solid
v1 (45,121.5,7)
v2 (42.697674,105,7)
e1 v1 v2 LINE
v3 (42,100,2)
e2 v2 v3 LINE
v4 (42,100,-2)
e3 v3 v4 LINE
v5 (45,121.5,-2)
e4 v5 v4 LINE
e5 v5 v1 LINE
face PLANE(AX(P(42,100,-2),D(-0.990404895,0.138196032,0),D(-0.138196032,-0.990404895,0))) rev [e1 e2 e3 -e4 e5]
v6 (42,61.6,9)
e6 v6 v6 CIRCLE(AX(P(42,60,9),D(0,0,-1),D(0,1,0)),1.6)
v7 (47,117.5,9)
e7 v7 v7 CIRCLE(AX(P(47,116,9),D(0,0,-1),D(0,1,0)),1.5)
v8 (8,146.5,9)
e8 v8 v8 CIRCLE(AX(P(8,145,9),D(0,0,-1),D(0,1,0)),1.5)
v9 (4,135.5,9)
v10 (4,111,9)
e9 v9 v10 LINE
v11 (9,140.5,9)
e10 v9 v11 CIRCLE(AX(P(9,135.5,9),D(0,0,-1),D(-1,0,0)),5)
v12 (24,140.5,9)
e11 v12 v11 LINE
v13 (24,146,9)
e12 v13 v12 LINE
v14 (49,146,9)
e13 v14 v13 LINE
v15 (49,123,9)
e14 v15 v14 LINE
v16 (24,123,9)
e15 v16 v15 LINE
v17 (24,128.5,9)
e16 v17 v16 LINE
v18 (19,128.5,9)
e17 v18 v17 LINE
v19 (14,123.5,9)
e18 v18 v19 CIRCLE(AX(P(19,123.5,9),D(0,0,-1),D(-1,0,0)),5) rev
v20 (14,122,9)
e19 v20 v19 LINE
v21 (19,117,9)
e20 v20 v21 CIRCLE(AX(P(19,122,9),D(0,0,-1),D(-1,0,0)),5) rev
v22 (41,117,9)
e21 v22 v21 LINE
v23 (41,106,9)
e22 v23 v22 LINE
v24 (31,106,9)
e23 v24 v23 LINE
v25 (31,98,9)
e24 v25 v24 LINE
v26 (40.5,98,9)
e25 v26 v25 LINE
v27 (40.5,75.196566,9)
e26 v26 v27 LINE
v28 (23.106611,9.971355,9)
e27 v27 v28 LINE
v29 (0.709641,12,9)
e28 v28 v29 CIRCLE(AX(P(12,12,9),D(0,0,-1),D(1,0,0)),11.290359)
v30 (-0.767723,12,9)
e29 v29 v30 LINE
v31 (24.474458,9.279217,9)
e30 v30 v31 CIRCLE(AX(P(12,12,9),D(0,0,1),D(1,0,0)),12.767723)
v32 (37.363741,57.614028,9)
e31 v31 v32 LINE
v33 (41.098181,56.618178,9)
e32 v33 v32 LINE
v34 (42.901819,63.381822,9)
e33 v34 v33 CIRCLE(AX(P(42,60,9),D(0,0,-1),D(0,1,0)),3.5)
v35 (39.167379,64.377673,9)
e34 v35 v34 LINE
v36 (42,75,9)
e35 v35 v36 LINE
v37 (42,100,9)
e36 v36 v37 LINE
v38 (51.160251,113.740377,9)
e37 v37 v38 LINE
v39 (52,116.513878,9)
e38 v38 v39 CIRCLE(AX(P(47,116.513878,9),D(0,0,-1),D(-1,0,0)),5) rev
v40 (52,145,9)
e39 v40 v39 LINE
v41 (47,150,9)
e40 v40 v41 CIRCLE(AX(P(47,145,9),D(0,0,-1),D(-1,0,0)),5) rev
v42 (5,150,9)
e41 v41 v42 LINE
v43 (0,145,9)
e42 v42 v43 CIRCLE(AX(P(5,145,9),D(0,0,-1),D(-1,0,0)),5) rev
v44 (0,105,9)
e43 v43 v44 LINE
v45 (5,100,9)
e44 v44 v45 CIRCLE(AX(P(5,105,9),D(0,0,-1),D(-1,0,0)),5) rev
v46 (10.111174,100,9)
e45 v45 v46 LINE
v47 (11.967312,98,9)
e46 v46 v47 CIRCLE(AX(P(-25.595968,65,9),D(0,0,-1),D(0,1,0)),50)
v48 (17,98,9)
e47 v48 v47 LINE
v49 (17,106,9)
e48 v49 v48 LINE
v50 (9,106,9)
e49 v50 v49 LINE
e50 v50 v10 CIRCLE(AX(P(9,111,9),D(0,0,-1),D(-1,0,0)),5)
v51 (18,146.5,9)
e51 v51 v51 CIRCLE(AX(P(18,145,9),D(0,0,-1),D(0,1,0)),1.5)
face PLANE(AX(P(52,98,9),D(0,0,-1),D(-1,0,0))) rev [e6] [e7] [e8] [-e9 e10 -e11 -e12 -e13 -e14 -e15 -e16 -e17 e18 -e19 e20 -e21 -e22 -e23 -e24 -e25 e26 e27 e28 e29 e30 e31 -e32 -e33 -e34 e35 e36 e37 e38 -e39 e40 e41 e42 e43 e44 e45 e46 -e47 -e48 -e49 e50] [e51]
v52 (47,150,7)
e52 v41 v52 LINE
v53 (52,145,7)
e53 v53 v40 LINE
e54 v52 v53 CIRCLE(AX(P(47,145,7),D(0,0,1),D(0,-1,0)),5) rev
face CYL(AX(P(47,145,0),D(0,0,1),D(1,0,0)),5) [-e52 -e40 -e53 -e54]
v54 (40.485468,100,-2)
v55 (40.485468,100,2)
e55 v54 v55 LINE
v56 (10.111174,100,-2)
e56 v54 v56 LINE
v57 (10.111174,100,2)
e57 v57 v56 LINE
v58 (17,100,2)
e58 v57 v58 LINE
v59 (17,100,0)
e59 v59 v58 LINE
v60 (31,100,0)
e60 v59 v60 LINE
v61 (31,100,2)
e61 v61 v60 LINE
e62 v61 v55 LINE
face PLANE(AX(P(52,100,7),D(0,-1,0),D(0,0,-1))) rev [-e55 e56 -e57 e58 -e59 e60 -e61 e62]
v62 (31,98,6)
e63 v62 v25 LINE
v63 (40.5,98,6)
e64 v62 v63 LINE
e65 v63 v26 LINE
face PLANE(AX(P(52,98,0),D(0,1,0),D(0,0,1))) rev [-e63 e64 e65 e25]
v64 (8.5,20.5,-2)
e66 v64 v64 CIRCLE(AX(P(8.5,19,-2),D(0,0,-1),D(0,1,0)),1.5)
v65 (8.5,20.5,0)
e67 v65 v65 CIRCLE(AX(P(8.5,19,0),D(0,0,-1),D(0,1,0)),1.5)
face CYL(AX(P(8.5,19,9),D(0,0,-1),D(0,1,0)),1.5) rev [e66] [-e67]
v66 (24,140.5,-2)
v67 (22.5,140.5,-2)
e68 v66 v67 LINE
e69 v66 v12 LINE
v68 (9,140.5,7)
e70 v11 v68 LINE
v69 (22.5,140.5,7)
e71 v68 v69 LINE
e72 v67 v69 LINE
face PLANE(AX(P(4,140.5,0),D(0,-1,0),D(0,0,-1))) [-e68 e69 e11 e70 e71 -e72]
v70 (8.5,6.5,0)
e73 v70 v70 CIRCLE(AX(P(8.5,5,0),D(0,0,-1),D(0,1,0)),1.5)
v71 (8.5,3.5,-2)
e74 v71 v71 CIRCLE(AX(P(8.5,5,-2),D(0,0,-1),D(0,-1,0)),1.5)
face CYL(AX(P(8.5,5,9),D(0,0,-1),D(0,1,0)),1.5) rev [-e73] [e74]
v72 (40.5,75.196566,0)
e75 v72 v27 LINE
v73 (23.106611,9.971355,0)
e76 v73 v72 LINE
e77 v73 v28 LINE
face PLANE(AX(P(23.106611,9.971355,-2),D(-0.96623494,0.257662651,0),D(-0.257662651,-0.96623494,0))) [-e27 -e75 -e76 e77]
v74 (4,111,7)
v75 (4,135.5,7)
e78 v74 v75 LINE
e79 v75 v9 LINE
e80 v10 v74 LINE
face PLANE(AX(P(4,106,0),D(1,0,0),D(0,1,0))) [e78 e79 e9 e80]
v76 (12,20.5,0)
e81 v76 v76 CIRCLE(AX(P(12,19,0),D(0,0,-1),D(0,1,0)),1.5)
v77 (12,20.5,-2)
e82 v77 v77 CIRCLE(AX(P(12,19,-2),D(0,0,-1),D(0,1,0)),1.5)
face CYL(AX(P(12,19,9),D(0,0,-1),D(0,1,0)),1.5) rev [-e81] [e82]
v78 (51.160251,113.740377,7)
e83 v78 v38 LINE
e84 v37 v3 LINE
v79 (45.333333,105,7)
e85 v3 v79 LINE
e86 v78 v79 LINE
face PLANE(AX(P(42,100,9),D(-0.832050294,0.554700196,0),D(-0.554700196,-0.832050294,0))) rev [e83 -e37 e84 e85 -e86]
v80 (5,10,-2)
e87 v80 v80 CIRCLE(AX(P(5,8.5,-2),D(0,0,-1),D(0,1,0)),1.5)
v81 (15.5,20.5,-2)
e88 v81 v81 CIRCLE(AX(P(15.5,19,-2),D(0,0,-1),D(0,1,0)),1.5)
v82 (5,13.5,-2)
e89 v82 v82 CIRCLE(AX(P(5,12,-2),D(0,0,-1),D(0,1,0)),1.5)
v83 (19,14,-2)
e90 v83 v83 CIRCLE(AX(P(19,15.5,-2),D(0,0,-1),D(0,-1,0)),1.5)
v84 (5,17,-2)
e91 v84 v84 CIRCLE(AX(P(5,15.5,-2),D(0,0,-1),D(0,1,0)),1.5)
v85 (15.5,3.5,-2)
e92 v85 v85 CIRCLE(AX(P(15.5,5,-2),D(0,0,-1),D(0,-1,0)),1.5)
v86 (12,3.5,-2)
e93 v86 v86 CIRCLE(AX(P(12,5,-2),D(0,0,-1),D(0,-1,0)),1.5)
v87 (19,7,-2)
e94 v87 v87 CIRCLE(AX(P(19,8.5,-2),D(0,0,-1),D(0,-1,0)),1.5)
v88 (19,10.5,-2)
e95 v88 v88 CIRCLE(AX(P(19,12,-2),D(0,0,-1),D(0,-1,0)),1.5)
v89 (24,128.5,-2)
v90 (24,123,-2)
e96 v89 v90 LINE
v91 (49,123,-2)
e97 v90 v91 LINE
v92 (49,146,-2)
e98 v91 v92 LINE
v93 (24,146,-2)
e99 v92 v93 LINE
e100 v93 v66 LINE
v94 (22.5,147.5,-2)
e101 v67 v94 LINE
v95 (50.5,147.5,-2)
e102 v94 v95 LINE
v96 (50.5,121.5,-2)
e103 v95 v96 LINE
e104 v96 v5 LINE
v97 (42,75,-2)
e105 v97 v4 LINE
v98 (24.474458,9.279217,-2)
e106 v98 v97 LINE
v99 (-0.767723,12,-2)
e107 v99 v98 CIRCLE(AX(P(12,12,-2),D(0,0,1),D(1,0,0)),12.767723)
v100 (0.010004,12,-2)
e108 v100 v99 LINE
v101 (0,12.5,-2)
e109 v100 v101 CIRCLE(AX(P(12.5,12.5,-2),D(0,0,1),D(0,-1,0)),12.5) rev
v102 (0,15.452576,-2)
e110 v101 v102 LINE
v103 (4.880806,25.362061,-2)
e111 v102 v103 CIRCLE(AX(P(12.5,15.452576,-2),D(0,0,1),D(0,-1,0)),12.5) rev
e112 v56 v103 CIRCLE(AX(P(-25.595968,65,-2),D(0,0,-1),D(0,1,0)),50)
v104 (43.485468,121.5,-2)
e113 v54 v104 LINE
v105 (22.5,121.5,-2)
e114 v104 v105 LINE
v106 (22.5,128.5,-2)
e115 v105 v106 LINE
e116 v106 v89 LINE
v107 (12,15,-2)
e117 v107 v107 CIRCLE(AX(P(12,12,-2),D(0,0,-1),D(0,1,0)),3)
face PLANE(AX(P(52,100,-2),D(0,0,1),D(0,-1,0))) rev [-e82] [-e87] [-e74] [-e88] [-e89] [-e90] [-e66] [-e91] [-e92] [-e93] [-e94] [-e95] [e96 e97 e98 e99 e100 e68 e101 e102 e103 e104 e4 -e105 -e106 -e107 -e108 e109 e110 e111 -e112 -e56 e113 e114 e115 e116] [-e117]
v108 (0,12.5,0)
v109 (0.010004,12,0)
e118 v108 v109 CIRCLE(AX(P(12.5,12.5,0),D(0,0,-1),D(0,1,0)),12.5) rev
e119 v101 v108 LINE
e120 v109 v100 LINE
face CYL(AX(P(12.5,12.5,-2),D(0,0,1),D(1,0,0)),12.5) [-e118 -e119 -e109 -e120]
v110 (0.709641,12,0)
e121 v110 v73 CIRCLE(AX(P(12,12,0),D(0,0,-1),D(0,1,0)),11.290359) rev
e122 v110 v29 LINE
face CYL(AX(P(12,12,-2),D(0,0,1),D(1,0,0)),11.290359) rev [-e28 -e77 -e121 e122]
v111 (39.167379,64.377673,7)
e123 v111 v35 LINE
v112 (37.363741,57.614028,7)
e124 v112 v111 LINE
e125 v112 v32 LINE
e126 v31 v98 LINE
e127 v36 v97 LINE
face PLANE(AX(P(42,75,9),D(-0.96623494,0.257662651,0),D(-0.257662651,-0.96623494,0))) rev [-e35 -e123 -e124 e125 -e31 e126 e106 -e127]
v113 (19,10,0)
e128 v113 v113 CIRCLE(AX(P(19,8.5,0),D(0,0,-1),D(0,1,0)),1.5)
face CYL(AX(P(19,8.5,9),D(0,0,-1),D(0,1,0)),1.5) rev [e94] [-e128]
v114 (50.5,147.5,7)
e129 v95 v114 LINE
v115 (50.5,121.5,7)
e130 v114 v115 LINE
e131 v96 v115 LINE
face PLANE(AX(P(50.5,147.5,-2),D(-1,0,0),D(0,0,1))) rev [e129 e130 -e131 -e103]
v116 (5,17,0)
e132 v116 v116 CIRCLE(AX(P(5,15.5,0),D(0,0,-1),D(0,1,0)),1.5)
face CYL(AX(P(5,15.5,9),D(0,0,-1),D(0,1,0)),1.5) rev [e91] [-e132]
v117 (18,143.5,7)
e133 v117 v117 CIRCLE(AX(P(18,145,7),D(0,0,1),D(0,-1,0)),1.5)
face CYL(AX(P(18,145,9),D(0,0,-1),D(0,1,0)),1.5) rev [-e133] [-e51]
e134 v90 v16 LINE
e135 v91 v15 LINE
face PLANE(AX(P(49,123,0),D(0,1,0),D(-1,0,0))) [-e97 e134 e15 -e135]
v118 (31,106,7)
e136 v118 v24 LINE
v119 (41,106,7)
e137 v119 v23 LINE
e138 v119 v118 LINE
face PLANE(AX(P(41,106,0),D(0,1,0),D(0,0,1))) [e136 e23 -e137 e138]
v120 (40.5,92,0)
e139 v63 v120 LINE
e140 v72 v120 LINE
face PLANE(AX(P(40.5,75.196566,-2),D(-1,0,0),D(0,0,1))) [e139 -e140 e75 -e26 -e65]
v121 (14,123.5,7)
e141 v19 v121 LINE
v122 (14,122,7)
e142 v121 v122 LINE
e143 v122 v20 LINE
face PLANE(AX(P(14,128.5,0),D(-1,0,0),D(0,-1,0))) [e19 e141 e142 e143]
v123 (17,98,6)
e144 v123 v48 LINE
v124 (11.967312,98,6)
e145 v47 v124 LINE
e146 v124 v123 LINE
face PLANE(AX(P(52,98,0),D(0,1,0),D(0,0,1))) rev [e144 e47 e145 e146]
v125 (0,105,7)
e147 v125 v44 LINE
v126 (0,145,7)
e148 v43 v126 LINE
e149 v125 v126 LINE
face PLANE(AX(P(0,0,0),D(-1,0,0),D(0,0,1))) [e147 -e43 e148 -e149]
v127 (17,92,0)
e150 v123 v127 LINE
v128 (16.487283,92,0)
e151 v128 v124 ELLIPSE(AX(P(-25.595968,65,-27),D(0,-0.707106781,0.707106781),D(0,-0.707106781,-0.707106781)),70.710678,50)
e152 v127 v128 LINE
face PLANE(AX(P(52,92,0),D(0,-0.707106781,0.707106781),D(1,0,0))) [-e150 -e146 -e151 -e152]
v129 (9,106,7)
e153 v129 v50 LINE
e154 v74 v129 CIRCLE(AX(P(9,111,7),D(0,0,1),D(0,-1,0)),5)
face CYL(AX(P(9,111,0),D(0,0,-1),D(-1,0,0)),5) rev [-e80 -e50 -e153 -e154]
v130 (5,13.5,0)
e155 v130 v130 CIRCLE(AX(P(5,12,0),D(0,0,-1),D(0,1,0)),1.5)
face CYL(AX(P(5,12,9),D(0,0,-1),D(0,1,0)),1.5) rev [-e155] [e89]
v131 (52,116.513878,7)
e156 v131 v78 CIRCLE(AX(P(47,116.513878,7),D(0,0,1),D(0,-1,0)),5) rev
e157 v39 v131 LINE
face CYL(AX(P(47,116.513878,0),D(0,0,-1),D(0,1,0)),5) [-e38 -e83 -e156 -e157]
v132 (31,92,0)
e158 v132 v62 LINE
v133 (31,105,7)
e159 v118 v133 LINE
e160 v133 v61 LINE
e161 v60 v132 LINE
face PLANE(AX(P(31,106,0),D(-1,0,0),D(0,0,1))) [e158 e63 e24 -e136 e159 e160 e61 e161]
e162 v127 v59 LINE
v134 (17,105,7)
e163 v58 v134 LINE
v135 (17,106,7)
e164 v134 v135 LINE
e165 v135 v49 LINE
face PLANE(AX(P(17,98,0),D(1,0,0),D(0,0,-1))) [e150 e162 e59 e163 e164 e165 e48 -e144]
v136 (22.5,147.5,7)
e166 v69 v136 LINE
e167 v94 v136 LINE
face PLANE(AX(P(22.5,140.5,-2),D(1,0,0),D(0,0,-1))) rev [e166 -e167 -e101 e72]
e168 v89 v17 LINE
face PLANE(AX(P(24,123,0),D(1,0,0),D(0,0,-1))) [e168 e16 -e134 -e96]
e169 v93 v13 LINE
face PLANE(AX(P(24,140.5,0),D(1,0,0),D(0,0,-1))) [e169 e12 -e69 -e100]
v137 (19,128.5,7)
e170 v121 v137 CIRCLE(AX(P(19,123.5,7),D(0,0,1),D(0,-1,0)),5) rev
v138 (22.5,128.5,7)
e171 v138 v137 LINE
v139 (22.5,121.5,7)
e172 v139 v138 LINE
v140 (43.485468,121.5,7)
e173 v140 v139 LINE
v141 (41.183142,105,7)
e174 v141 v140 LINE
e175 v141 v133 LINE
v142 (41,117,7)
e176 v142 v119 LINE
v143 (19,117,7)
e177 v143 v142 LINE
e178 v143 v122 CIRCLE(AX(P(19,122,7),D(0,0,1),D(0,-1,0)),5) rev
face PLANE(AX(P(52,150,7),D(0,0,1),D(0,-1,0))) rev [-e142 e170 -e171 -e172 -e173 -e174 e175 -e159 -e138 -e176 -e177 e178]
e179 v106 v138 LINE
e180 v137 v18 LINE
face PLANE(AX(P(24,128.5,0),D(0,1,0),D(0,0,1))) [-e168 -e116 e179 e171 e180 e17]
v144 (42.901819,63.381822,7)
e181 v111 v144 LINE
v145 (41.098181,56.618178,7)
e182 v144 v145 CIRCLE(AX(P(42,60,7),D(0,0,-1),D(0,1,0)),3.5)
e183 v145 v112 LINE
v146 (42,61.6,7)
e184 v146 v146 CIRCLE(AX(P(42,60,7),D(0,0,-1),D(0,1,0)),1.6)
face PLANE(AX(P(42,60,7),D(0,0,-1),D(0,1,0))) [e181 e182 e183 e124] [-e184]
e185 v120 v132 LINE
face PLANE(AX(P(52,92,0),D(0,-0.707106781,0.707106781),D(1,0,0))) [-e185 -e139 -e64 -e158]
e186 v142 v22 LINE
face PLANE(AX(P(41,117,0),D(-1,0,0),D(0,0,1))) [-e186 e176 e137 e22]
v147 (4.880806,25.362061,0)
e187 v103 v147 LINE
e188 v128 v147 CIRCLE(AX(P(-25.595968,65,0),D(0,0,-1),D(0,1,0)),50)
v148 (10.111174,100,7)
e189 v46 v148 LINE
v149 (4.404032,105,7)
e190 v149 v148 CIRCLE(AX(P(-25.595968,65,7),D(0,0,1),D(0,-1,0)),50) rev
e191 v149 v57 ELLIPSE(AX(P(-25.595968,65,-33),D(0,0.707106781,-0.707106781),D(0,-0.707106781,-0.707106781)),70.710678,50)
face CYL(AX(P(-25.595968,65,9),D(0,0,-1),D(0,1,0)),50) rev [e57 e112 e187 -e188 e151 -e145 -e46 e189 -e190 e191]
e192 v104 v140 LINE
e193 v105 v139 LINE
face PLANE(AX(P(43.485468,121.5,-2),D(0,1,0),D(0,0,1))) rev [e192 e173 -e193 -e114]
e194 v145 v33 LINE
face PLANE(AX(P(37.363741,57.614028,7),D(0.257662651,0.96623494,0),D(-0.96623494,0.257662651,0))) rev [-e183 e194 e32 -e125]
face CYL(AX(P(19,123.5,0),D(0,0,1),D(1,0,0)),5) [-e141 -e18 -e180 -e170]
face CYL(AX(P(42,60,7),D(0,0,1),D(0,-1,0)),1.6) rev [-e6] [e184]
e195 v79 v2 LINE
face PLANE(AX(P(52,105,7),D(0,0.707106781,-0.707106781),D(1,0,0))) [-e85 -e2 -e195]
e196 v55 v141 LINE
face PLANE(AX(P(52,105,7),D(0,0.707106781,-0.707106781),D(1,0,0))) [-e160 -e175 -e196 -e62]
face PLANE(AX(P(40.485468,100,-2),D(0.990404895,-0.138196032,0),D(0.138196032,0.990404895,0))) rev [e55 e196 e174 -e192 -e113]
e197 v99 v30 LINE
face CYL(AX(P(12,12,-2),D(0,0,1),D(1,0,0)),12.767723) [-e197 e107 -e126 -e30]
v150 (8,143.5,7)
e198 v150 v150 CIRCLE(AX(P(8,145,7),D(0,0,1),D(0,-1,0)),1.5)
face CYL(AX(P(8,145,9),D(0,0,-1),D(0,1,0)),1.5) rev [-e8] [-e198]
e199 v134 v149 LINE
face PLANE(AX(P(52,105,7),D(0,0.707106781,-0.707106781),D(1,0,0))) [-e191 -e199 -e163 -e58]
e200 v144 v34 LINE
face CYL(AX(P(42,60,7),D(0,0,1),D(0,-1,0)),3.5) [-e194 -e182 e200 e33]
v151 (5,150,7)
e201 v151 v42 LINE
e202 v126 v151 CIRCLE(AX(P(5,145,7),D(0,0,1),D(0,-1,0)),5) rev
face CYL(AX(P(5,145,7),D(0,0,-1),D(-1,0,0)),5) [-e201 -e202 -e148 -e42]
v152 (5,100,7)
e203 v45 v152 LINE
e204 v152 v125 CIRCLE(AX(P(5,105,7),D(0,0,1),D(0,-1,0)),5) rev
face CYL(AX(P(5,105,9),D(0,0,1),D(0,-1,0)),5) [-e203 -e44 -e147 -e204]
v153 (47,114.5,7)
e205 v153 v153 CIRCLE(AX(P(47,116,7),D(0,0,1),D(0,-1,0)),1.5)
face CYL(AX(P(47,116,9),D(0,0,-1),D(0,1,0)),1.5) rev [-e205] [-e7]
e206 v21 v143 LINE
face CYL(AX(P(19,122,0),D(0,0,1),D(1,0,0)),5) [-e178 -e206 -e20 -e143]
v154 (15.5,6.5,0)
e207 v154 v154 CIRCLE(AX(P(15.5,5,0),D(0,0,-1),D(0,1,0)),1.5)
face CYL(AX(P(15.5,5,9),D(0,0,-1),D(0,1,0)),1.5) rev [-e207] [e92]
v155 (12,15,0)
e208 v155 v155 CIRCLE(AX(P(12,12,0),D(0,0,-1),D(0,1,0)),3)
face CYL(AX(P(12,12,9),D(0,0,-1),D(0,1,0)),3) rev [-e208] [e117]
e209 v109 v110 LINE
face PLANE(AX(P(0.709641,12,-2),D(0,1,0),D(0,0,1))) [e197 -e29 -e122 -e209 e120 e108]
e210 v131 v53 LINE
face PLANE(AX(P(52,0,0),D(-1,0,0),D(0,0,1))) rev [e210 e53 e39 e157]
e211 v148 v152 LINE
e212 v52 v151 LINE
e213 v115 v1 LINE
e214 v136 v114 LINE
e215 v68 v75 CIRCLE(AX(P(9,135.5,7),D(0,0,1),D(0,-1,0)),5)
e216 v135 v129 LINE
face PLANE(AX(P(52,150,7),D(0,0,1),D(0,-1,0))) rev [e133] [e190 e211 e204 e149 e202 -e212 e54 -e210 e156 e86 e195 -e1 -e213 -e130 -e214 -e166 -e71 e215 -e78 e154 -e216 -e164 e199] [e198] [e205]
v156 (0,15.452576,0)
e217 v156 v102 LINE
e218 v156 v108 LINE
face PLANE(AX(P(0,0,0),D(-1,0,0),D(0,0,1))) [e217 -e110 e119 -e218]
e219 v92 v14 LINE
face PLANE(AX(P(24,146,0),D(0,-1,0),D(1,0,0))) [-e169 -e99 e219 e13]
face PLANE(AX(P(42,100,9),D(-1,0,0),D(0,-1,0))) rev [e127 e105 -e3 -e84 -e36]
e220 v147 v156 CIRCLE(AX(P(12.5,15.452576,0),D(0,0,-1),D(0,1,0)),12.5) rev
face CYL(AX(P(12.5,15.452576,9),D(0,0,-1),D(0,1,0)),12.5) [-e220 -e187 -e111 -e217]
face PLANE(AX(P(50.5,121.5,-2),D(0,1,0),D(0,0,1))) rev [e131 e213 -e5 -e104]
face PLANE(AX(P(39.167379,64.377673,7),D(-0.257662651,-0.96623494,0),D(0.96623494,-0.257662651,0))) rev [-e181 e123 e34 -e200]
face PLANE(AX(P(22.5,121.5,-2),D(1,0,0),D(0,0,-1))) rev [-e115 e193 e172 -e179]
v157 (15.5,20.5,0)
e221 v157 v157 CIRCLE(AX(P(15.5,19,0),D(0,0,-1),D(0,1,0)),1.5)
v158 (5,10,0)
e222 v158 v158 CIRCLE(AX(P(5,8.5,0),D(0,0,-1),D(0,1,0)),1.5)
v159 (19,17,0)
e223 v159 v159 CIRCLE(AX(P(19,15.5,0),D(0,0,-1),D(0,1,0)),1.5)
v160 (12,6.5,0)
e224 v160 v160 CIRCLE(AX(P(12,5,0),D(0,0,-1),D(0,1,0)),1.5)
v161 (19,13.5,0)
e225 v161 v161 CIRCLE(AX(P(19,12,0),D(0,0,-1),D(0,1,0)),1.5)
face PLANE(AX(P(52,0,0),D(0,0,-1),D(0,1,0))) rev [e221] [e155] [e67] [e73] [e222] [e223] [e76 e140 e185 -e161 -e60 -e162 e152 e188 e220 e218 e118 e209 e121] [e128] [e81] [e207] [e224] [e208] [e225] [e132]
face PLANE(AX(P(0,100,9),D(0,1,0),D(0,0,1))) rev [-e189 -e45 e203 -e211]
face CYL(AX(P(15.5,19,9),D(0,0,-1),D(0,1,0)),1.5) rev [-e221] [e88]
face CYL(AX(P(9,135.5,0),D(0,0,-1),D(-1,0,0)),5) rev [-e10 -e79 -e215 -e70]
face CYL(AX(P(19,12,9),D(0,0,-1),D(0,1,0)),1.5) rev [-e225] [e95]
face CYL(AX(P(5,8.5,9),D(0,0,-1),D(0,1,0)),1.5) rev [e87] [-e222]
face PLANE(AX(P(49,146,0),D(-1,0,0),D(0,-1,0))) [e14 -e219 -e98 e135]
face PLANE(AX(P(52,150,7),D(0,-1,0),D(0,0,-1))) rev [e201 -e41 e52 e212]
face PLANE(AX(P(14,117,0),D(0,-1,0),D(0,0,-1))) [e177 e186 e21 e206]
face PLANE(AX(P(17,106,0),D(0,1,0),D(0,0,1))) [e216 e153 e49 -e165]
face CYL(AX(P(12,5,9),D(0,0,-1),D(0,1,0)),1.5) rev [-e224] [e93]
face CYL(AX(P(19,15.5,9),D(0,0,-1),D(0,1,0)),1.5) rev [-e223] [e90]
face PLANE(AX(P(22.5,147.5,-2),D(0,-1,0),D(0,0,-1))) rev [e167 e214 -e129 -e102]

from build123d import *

# Parameters (mm, degrees)
EXTRUDE_1_DEPTH                 = 52
CUT_EXTRUDE_1_REACH             = 161.013
CUT_EXTRUDE_1_DIRECTION_2_DEPTH = 7
SKETCH_3_R                      = 1.5
SKETCH_3_R_2                    = 3
CUT_EXTRUDE_2_DEPTH             = 160.138304628
FILLET_1_R                      = 5
CHAMFER_1_SIZE                  = 5
FILLET_2_R                      = 12.5
EXTRUDE_2_DEPTH                 = 9
EXTRUDE_3_DEPTH                 = 9
EXTRUDE_3_DEPTH_BACK            = 2
CHAMFER_3_SIZE                  = 6
EXTRUDE_START                   = -11
SKETCH_7_R                      = 1.6
EXTRUDE_4_DEPTH                 = 2


with BuildPart() as part:
    # 草图1 → 凸台-拉伸1 (new body)
    with BuildSketch(Plane(origin=(0, 0, 0), x_dir=(0, 0, -1), z_dir=(1, 0, 0))):
        Polygon((0, 0), (0, 98), (-9, 98), (-9, 150), (-7, 150), (-7, 100), (2, 100), (2, 0), align=None)
    extrude(amount=EXTRUDE_1_DEPTH)

    # 草图2 → 切除-拉伸1 (cut, up to next)
    with BuildSketch(Plane(origin=(0, 0, 7), x_dir=(-1, 0, 0), z_dir=(0, 0, -1)), mode=Mode.PRIVATE) as cut_extrude_1_sk1:
        Polygon((-49, 146), (-49, 123), (-24, 123), (-24, 128.5), (-14, 128.5), (-14, 117), (-41, 117), (-41, 106), (-31, 106), (-31, 98), (-17, 98), (-17, 106), (-4, 106), (-4, 140.5), (-24, 140.5), (-24, 146), align=None)
    cut_extrude_1_tool1 = extrude(cut_extrude_1_sk1.sketch, amount=-CUT_EXTRUDE_1_REACH, mode=Mode.PRIVATE) & part.part
    add(cut_extrude_1_tool1.solids().sort_by_distance((25.692202, 124.595066, 7))[0], mode=Mode.SUBTRACT)

    # 草图2 → 切除-拉伸1 direction 2 (cut)
    with BuildSketch(Plane(origin=(0, 0, 7), x_dir=(-1, 0, 0), z_dir=(0, 0, -1))):
        Polygon((-49, 146), (-49, 123), (-24, 123), (-24, 128.5), (-14, 128.5), (-14, 117), (-41, 117), (-41, 106), (-31, 106), (-31, 98), (-17, 98), (-17, 106), (-4, 106), (-4, 140.5), (-24, 140.5), (-24, 146), align=None)
    extrude(amount=CUT_EXTRUDE_1_DIRECTION_2_DEPTH, mode=Mode.SUBTRACT)

    # 草图3 → 切除-拉伸2 (cut, through all)
    with BuildSketch(Plane(origin=(0, 0, -2), x_dir=(-1, 0, 0), z_dir=(0, 0, -1))):
        with Locations(Location((-15.5, 19, 0), (0, 0, 90))):
            Circle(SKETCH_3_R)
        with Locations(Location((-12, 19, 0), (0, 0, 90))):
            Circle(SKETCH_3_R)
        with Locations(Location((-8.5, 19, 0), (0, 0, 90))):
            Circle(SKETCH_3_R)
        with Locations(Location((-8.5, 5, 0), (0, 0, 90))):
            Circle(SKETCH_3_R)
        with Locations(Location((-12, 5, 0), (0, 0, 90))):
            Circle(SKETCH_3_R)
        with Locations(Location((-15.5, 5, 0), (0, 0, 90))):
            Circle(SKETCH_3_R)
        with Locations(Location((-5, 15.5, 0), (0, 0, 90))):
            Circle(SKETCH_3_R)
        with Locations(Location((-5, 12, 0), (0, 0, 90))):
            Circle(SKETCH_3_R)
        with Locations(Location((-5, 8.5, 0), (0, 0, 90))):
            Circle(SKETCH_3_R)
        with Locations(Location((-19, 8.5, 0), (0, 0, 90))):
            Circle(SKETCH_3_R)
        with Locations(Location((-19, 12, 0), (0, 0, 90))):
            Circle(SKETCH_3_R)
        with Locations(Location((-19, 15.5, 0), (0, 0, 90))):
            Circle(SKETCH_3_R)
        with Locations(Location((-8, 145, 0), (0, 0, 90))):
            Circle(SKETCH_3_R)
        with Locations(Location((-47, 116, 0), (0, 0, 90))):
            Circle(SKETCH_3_R)
        with Locations(Location((-18, 145, 0), (0, 0, 90))):
            Circle(SKETCH_3_R)
        with Locations(Location((-12, 12, 0), (0, 0, 90))):
            Circle(SKETCH_3_R_2)
        Polygon((-42, 75), (-22, 0), (-52, 0), (-52, 115), (-42, 100), align=None)
        with BuildLine():
            Line((0, 100), (-10.111173925, 100))
            ThreePointArc((-10.111173925, 100), (-23.988643866, 58.568340451), (0, 22.048324701))
            Line((0, 22.048324701), (0, 100))
        make_face()
    extrude(amount=-CUT_EXTRUDE_2_DEPTH, mode=Mode.SUBTRACT)

    # 圆角1
    fillet_1_edges = [part.edges().sort_by_distance(p)[0] for p in [
        (0, 100, 8),
        (52, 115, 8),
        (52, 150, 8),
        (14, 128.5, 8),
        (14, 117, 8),
        (4, 106, 8),
        (4, 140.5, 8),
        (0, 150, 8),
    ]]
    fillet(fillet_1_edges, radius=FILLET_1_R)

    # 倒角1
    chamfer_1_edges = [part.edges().sort_by_distance(p)[0] for p in [
        (36.5, 100, 7),
        (13.555586963, 100, 7),
    ]]
    chamfer(chamfer_1_edges, length=CHAMFER_1_SIZE)

    # 圆角2
    # the kernel refuses this fillet: 12.5 mm, written as the material it takes off along each edge
    with BuildSketch(Plane(origin=(22, 0, -26.008697284), x_dir=(0.2576626505603326, 0.9662349396012463, 0), z_dir=(0, 0, 1))) as fillet_2_piece_1:
        with BuildLine():
            CenterArc((FILLET_2_R * 0.768278313084, FILLET_2_R), FILLET_2_R, 194.931417178, 75.068582822)
            Line((-FILLET_2_R * 0.197956626517, FILLET_2_R * 0.74233734944), (0, 0))
            Line((0, 0), (FILLET_2_R * 0.768278313084, 0))
        make_face()
    extrude(amount=50.017394568, mode=Mode.SUBTRACT)
    with BuildSketch(Plane(origin=(0, 0, -33.25), x_dir=(1, 0, 0), z_dir=(0, 0, 1))) as fillet_2_piece_2:
        with BuildLine():
            CenterArc((FILLET_2_R, FILLET_2_R), FILLET_2_R, 180, 90)
            Line((0, FILLET_2_R), (0, 0))
            Line((0, 0), (FILLET_2_R, 0))
        make_face()
    extrude(amount=64.5, mode=Mode.SUBTRACT)
    with BuildSketch(Plane(origin=(0, 22.048324701, -18.489371261), x_dir=(0.8273370938030895, 0.561705735432226, 0), z_dir=(0, 0, 1))) as fillet_2_piece_3:
        with BuildLine():
            CenterArc((6.636843908, -12.478229092), FILLET_2_R, 93.382080567, 52.444076451)
            Line((-3.704869764, -5.456907399), (0, 0))
            ThreePointArc((0, 0), (2.949708404, -0.087083632), (5.899416807, 0))
        make_face()
    extrude(amount=34.978742522, mode=Mode.SUBTRACT)

    # 草图4 → 凸台-拉伸2 (add)
    with BuildSketch(Plane(origin=(0, 0, 7), x_dir=(-1, 0, 0), z_dir=(0, 0, -1))):
        Polygon((-24, 128.5), (-24, 123), (-49, 123), (-49, 146), (-24, 146), (-24, 140.5), (-22.5, 140.5), (-22.5, 147.5), (-50.5, 147.5), (-50.5, 121.5), (-45, 121.5), (-42, 100), (-40.485467906, 100), (-43.485467906, 121.5), (-22.5, 121.5), (-22.5, 128.5), align=None)
    extrude(amount=EXTRUDE_2_DEPTH)

    # 草图6 → 凸台-拉伸3 (add, two sides: drawn at the far end of the back side and taken through both)
    with BuildSketch(Plane.XY.offset(-EXTRUDE_3_DEPTH_BACK)):
        with BuildLine():
            Line((42, 98), (42, 75))
            Line((42, 75), (24.474457831, 9.279216868))
            ThreePointArc((24.474457831, 9.279216868), (10.631728691, -0.694195235), (-0.76772333, 12))
            Line((-0.76772333, 12), (0.709641329, 12))
            ThreePointArc((0.709641329, 12), (10.981525419, 0.755672166), (23.10661066, 9.971355488))
            Line((23.10661066, 9.971355488), (40.5, 75.196565511))
            Line((40.5, 75.196565511), (40.5, 98))
            Line((40.5, 98), (42, 98))
        make_face()
    extrude(amount=EXTRUDE_3_DEPTH + EXTRUDE_3_DEPTH_BACK)

    # 倒角3
    chamfer_3_edges = [part.edges().sort_by_distance(p)[0] for p in [
        (14.483655862, 98, 0),
        (35.75, 98, 0),
    ]]
    chamfer(chamfer_3_edges, length=CHAMFER_3_SIZE)

    # 草图7 → 凸台-拉伸4 (add)
    with BuildSketch(Plane(origin=(0, 0, -2), x_dir=(-1, 0, 0), z_dir=(0, 0, -1)).offset(EXTRUDE_START)):
        with BuildLine():
            Line((-39.167379443, 64.377672911), (-42.901819277, 63.381822289))
            ThreePointArc((-42.901819277, 63.381822289), (-45.381822289, 59.098180723), (-41.098180723, 56.618177711))
            Line((-41.098180723, 56.618177711), (-37.363740889, 57.614028334))
            Line((-37.363740889, 57.614028334), (-39.167379443, 64.377672911))
        make_face()
        with Locations(Location((-42, 60, 0), (0, 0, 90))):
            Circle(SKETCH_7_R, mode=Mode.SUBTRACT)
    extrude(amount=EXTRUDE_4_DEPTH)


solid = part.part
